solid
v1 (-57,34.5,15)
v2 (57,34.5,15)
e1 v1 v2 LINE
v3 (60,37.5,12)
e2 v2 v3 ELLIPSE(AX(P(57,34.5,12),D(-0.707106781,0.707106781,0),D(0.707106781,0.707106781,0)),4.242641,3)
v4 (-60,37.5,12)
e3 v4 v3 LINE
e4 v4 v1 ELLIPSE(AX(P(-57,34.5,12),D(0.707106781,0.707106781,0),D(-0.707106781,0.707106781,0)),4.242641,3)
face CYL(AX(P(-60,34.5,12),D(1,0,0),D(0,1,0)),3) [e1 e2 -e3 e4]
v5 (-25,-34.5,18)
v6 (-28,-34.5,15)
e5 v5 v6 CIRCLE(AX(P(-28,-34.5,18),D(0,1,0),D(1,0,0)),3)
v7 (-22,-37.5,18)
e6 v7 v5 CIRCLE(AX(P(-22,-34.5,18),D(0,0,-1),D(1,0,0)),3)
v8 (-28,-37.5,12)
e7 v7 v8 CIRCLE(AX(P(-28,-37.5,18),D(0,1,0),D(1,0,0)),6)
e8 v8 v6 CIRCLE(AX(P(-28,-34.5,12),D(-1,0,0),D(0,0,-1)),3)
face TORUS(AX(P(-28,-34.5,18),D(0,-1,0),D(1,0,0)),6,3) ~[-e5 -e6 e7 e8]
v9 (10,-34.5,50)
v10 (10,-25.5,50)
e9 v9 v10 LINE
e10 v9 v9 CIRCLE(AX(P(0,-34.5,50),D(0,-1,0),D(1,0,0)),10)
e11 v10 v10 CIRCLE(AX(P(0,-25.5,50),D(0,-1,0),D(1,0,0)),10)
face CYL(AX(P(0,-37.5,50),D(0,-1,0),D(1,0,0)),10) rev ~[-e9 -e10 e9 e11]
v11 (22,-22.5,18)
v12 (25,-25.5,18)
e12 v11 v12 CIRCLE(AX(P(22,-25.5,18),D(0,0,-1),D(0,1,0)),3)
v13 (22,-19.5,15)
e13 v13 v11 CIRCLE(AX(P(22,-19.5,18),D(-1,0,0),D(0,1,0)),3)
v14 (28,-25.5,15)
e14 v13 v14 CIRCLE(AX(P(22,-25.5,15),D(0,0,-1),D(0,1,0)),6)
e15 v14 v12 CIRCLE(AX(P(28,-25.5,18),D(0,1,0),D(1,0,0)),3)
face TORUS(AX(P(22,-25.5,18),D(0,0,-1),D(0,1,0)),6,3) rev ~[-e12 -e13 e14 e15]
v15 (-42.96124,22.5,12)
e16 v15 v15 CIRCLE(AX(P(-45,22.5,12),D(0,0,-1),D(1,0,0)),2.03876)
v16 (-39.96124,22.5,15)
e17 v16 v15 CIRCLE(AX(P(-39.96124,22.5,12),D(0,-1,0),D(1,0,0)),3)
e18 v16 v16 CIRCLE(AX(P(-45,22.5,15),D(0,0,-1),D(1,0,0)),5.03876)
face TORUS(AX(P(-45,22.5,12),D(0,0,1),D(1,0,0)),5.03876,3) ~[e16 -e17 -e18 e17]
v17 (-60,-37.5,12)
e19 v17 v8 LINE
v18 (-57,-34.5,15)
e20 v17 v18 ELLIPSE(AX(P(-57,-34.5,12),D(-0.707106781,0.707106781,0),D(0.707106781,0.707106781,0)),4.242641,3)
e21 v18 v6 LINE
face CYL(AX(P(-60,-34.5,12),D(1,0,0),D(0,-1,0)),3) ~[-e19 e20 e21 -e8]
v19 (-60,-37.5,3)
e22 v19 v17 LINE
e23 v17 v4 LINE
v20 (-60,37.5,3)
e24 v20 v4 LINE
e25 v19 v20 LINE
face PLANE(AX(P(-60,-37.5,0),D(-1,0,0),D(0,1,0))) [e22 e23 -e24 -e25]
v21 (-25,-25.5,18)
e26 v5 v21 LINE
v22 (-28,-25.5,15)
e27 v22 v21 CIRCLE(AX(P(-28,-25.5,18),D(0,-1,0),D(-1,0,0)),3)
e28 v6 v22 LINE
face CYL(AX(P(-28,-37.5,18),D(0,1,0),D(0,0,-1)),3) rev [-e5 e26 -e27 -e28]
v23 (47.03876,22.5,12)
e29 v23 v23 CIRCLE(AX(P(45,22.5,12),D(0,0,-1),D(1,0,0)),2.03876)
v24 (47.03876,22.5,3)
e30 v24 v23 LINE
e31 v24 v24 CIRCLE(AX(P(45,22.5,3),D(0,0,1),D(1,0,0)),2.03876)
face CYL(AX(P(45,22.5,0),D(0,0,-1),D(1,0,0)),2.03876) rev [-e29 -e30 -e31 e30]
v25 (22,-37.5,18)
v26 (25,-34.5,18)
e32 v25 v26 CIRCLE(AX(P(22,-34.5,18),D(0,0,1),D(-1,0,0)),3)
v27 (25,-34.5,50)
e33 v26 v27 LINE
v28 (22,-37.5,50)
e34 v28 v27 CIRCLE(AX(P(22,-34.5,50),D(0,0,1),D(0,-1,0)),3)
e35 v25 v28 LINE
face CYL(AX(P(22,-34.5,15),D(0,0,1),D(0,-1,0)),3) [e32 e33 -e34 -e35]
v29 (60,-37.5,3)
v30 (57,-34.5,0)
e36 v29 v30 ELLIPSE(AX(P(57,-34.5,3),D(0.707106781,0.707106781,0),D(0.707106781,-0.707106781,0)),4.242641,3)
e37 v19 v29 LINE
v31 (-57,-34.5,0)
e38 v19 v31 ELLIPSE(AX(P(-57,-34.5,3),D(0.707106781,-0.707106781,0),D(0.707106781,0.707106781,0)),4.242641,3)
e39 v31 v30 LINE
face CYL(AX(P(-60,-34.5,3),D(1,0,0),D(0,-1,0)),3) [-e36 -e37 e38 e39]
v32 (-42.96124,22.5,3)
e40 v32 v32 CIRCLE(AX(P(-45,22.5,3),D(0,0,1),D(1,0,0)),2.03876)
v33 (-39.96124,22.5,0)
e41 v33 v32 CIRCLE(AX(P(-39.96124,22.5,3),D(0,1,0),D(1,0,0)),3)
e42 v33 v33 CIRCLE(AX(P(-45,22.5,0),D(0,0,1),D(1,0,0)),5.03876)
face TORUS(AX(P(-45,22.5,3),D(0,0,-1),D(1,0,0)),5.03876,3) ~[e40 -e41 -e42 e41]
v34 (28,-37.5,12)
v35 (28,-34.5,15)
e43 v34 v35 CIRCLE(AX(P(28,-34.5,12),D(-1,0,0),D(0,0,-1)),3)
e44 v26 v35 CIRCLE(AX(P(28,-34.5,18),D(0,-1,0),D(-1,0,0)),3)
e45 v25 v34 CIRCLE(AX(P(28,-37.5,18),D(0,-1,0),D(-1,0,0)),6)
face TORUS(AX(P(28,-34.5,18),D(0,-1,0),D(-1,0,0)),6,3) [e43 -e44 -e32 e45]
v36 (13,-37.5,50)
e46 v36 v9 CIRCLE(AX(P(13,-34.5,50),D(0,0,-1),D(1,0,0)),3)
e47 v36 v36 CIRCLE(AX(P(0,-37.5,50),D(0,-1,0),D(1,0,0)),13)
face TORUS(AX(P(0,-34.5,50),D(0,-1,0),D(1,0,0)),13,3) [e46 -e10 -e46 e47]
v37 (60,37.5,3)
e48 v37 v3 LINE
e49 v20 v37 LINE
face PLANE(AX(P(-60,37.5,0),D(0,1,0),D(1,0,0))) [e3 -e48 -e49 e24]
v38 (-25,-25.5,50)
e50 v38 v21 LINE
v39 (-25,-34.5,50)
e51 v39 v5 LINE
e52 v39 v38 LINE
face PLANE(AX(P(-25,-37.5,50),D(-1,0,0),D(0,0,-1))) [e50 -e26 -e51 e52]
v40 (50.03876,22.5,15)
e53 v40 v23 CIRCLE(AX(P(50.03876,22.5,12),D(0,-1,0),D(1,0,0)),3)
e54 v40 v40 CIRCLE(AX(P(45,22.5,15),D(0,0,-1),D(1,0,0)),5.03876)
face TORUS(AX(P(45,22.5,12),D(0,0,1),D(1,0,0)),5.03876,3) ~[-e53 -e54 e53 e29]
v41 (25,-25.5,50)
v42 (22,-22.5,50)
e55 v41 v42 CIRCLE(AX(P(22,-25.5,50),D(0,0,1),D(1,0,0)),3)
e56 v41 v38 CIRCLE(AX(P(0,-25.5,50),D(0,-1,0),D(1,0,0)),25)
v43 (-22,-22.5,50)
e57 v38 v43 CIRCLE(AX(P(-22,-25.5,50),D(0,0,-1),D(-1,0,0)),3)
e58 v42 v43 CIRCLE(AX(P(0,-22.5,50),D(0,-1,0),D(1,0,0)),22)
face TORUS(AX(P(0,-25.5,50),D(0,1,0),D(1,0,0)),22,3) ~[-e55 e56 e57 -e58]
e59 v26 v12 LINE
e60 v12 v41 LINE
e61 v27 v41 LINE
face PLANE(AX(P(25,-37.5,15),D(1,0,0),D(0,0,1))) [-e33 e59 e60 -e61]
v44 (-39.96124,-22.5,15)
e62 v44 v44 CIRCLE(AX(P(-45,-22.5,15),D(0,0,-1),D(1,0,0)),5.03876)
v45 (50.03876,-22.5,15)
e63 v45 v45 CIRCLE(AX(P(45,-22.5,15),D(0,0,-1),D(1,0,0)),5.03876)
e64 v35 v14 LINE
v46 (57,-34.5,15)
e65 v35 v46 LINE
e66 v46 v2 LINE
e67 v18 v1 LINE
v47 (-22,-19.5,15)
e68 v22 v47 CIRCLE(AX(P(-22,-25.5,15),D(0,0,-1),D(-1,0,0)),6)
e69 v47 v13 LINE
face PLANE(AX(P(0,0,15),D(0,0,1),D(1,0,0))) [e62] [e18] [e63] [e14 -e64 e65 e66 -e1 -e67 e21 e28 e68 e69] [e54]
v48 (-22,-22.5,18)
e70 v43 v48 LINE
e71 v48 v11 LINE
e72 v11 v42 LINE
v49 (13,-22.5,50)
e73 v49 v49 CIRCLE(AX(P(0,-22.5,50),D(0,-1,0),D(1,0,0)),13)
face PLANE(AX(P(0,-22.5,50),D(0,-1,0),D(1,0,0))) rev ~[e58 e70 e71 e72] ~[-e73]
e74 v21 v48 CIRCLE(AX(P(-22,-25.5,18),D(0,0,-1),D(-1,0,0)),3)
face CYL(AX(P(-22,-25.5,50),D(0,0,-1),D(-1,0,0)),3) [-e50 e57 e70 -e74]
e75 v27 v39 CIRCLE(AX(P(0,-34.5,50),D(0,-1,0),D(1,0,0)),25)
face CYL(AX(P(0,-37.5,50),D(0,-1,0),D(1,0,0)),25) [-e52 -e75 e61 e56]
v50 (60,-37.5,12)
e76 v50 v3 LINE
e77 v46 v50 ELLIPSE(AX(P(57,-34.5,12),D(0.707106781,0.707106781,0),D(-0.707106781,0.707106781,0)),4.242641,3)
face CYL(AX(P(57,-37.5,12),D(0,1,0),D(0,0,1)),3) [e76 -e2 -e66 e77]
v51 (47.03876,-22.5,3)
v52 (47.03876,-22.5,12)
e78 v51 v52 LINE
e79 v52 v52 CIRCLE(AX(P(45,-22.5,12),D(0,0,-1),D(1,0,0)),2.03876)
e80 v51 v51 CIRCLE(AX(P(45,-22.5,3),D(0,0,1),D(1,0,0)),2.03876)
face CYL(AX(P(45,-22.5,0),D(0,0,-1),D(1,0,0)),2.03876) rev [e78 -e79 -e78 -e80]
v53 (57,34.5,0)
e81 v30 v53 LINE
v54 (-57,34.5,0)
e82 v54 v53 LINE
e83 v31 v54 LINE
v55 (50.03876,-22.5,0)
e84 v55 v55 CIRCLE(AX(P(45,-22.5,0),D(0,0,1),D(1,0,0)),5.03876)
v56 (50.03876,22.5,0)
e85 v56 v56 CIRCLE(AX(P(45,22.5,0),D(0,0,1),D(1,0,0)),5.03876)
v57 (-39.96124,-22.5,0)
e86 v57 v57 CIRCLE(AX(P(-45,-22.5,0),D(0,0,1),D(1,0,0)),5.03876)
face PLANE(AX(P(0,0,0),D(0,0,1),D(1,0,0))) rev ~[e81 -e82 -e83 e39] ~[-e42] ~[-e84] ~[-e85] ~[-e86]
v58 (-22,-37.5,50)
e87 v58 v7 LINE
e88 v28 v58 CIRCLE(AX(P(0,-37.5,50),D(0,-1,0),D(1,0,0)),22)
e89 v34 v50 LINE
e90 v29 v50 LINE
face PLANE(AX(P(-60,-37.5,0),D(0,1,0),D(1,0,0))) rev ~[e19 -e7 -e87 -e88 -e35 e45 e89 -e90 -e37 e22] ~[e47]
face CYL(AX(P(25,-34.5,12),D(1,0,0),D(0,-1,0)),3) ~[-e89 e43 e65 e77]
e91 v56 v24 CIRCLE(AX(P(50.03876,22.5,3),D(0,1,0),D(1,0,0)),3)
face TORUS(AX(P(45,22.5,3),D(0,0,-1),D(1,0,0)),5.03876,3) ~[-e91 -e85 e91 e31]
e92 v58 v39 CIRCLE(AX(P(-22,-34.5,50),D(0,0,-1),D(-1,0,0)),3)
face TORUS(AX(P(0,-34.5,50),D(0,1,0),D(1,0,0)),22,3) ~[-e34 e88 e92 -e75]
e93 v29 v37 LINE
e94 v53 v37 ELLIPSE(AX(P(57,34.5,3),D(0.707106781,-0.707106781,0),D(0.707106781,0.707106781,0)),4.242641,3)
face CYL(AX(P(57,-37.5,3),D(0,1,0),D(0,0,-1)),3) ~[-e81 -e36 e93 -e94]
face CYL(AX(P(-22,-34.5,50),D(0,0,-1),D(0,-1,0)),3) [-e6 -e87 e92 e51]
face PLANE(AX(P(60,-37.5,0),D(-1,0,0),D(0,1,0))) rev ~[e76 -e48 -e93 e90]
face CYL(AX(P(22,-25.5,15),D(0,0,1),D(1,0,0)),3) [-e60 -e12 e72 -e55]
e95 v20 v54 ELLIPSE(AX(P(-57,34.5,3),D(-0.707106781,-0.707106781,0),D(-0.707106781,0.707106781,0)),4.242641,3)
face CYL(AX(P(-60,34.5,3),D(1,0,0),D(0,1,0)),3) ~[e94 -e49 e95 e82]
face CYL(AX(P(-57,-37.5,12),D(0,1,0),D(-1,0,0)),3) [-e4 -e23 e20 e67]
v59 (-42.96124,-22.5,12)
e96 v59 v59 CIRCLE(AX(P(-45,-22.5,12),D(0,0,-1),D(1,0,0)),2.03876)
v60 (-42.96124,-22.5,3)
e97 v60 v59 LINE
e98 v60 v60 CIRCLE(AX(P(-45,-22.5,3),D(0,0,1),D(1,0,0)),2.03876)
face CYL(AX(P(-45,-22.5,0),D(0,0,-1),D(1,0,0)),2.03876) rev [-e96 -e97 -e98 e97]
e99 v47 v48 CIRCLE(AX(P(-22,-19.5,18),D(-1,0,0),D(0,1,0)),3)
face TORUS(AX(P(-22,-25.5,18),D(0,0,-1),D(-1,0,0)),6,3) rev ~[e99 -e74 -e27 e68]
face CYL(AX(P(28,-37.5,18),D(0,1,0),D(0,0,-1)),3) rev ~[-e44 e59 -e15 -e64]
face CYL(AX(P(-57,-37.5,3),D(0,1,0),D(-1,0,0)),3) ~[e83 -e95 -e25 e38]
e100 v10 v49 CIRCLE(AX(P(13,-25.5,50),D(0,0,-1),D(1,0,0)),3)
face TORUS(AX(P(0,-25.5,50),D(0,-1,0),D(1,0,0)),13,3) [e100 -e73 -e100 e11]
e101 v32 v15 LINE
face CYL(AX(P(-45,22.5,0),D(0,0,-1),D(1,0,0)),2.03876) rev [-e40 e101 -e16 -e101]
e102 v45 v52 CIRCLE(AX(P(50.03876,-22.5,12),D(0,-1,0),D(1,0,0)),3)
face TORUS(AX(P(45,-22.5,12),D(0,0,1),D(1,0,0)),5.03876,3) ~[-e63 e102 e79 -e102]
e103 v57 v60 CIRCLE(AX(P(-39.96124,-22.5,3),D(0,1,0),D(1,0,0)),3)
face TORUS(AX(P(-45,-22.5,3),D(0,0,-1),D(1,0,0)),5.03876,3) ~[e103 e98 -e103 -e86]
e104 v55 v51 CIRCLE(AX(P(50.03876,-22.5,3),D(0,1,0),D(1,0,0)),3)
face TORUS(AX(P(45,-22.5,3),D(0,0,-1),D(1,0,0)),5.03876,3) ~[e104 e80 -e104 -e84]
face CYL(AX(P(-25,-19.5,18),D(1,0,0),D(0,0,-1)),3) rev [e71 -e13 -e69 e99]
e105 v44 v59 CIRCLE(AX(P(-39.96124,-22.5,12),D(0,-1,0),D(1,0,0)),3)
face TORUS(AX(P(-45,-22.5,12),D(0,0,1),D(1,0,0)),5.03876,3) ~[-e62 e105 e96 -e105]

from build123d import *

# Parameters (mm, degrees)
F0_W     = 120
F0_H     = 75
F1_DEPTH = 15
F2_R     = 10
F3_DEPTH = 15
F4_R     = 2.0387597586
F5_DEPTH = 75.001
F6_R     = 3


with BuildPart() as f1:
    # F0 (on Top) → F1 (new body)
    with BuildSketch(Plane.XY):
        Rectangle(F0_W, F0_H)
    extrude(amount=F1_DEPTH)

    # F2 (on face) → F3 (join)
    with BuildSketch(Plane.XZ.offset(37.5)):
        with BuildLine():
            ThreePointArc((-25, 50), (0, 25), (25, 50))
            ThreePointArc((25, 50), (0, 75), (-25, 50))
        make_face()
        with Locations((0, 50)):
            Circle(F2_R, mode=Mode.SUBTRACT)
        with BuildLine():
            Line((25, 15), (25, 50))
            ThreePointArc((25, 50), (0, 25), (-25, 50))
            Line((-25, 50), (-25, 15))
            Line((-25, 15), (25, 15))
        make_face()
    extrude(amount=-F3_DEPTH)

    # F4 (on Top) → F5 (cut, through all)
    with BuildSketch(Plane.XY):
        with Locations((45, 22.5)):
            Circle(F4_R)
        with Locations((-45, 22.5)):
            Circle(F4_R)
        with Locations((-45, -22.5)):
            Circle(F4_R)
        with Locations((45, -22.5)):
            Circle(F4_R)
    extrude(amount=F5_DEPTH, mode=Mode.SUBTRACT)

    # F6
    f6_edges = [f1.edges().sort_by_distance(p)[0] for p in [
        (0, -37.5, 75),
        (0, -22.5, 75),
        (60, 0, 15),
        (-60, 0, 15),
        (0, 37.5, 15),
        (-42.5, -37.5, 15),
        (-47.03876, -22.5, 15),
        (-47.03876, 22.5, 15),
        (42.96124, 22.5, 15),
        (42.96124, -22.5, 15),
        (-25, -37.5, 32.5),
        (-25, -22.5, 32.5),
        (25, -22.5, 32.5),
        (25, -37.5, 32.5),
        (-10, -22.5, 50),
        (-10, -37.5, 50),
        (-25, -30, 15),
        (0, -37.5, 0),
        (-60, 0, 0),
        (60, 0, 0),
        (0, 37.5, 0),
        (-47.03876, -22.5, 0),
        (42.96124, -22.5, 0),
        (-47.03876, 22.5, 0),
        (42.96124, 22.5, 0),
        (42.5, -37.5, 15),
        (0, -22.5, 15),
        (25, -30, 15),
    ]]
    fillet(f6_edges, radius=F6_R)


solid = f1.part
